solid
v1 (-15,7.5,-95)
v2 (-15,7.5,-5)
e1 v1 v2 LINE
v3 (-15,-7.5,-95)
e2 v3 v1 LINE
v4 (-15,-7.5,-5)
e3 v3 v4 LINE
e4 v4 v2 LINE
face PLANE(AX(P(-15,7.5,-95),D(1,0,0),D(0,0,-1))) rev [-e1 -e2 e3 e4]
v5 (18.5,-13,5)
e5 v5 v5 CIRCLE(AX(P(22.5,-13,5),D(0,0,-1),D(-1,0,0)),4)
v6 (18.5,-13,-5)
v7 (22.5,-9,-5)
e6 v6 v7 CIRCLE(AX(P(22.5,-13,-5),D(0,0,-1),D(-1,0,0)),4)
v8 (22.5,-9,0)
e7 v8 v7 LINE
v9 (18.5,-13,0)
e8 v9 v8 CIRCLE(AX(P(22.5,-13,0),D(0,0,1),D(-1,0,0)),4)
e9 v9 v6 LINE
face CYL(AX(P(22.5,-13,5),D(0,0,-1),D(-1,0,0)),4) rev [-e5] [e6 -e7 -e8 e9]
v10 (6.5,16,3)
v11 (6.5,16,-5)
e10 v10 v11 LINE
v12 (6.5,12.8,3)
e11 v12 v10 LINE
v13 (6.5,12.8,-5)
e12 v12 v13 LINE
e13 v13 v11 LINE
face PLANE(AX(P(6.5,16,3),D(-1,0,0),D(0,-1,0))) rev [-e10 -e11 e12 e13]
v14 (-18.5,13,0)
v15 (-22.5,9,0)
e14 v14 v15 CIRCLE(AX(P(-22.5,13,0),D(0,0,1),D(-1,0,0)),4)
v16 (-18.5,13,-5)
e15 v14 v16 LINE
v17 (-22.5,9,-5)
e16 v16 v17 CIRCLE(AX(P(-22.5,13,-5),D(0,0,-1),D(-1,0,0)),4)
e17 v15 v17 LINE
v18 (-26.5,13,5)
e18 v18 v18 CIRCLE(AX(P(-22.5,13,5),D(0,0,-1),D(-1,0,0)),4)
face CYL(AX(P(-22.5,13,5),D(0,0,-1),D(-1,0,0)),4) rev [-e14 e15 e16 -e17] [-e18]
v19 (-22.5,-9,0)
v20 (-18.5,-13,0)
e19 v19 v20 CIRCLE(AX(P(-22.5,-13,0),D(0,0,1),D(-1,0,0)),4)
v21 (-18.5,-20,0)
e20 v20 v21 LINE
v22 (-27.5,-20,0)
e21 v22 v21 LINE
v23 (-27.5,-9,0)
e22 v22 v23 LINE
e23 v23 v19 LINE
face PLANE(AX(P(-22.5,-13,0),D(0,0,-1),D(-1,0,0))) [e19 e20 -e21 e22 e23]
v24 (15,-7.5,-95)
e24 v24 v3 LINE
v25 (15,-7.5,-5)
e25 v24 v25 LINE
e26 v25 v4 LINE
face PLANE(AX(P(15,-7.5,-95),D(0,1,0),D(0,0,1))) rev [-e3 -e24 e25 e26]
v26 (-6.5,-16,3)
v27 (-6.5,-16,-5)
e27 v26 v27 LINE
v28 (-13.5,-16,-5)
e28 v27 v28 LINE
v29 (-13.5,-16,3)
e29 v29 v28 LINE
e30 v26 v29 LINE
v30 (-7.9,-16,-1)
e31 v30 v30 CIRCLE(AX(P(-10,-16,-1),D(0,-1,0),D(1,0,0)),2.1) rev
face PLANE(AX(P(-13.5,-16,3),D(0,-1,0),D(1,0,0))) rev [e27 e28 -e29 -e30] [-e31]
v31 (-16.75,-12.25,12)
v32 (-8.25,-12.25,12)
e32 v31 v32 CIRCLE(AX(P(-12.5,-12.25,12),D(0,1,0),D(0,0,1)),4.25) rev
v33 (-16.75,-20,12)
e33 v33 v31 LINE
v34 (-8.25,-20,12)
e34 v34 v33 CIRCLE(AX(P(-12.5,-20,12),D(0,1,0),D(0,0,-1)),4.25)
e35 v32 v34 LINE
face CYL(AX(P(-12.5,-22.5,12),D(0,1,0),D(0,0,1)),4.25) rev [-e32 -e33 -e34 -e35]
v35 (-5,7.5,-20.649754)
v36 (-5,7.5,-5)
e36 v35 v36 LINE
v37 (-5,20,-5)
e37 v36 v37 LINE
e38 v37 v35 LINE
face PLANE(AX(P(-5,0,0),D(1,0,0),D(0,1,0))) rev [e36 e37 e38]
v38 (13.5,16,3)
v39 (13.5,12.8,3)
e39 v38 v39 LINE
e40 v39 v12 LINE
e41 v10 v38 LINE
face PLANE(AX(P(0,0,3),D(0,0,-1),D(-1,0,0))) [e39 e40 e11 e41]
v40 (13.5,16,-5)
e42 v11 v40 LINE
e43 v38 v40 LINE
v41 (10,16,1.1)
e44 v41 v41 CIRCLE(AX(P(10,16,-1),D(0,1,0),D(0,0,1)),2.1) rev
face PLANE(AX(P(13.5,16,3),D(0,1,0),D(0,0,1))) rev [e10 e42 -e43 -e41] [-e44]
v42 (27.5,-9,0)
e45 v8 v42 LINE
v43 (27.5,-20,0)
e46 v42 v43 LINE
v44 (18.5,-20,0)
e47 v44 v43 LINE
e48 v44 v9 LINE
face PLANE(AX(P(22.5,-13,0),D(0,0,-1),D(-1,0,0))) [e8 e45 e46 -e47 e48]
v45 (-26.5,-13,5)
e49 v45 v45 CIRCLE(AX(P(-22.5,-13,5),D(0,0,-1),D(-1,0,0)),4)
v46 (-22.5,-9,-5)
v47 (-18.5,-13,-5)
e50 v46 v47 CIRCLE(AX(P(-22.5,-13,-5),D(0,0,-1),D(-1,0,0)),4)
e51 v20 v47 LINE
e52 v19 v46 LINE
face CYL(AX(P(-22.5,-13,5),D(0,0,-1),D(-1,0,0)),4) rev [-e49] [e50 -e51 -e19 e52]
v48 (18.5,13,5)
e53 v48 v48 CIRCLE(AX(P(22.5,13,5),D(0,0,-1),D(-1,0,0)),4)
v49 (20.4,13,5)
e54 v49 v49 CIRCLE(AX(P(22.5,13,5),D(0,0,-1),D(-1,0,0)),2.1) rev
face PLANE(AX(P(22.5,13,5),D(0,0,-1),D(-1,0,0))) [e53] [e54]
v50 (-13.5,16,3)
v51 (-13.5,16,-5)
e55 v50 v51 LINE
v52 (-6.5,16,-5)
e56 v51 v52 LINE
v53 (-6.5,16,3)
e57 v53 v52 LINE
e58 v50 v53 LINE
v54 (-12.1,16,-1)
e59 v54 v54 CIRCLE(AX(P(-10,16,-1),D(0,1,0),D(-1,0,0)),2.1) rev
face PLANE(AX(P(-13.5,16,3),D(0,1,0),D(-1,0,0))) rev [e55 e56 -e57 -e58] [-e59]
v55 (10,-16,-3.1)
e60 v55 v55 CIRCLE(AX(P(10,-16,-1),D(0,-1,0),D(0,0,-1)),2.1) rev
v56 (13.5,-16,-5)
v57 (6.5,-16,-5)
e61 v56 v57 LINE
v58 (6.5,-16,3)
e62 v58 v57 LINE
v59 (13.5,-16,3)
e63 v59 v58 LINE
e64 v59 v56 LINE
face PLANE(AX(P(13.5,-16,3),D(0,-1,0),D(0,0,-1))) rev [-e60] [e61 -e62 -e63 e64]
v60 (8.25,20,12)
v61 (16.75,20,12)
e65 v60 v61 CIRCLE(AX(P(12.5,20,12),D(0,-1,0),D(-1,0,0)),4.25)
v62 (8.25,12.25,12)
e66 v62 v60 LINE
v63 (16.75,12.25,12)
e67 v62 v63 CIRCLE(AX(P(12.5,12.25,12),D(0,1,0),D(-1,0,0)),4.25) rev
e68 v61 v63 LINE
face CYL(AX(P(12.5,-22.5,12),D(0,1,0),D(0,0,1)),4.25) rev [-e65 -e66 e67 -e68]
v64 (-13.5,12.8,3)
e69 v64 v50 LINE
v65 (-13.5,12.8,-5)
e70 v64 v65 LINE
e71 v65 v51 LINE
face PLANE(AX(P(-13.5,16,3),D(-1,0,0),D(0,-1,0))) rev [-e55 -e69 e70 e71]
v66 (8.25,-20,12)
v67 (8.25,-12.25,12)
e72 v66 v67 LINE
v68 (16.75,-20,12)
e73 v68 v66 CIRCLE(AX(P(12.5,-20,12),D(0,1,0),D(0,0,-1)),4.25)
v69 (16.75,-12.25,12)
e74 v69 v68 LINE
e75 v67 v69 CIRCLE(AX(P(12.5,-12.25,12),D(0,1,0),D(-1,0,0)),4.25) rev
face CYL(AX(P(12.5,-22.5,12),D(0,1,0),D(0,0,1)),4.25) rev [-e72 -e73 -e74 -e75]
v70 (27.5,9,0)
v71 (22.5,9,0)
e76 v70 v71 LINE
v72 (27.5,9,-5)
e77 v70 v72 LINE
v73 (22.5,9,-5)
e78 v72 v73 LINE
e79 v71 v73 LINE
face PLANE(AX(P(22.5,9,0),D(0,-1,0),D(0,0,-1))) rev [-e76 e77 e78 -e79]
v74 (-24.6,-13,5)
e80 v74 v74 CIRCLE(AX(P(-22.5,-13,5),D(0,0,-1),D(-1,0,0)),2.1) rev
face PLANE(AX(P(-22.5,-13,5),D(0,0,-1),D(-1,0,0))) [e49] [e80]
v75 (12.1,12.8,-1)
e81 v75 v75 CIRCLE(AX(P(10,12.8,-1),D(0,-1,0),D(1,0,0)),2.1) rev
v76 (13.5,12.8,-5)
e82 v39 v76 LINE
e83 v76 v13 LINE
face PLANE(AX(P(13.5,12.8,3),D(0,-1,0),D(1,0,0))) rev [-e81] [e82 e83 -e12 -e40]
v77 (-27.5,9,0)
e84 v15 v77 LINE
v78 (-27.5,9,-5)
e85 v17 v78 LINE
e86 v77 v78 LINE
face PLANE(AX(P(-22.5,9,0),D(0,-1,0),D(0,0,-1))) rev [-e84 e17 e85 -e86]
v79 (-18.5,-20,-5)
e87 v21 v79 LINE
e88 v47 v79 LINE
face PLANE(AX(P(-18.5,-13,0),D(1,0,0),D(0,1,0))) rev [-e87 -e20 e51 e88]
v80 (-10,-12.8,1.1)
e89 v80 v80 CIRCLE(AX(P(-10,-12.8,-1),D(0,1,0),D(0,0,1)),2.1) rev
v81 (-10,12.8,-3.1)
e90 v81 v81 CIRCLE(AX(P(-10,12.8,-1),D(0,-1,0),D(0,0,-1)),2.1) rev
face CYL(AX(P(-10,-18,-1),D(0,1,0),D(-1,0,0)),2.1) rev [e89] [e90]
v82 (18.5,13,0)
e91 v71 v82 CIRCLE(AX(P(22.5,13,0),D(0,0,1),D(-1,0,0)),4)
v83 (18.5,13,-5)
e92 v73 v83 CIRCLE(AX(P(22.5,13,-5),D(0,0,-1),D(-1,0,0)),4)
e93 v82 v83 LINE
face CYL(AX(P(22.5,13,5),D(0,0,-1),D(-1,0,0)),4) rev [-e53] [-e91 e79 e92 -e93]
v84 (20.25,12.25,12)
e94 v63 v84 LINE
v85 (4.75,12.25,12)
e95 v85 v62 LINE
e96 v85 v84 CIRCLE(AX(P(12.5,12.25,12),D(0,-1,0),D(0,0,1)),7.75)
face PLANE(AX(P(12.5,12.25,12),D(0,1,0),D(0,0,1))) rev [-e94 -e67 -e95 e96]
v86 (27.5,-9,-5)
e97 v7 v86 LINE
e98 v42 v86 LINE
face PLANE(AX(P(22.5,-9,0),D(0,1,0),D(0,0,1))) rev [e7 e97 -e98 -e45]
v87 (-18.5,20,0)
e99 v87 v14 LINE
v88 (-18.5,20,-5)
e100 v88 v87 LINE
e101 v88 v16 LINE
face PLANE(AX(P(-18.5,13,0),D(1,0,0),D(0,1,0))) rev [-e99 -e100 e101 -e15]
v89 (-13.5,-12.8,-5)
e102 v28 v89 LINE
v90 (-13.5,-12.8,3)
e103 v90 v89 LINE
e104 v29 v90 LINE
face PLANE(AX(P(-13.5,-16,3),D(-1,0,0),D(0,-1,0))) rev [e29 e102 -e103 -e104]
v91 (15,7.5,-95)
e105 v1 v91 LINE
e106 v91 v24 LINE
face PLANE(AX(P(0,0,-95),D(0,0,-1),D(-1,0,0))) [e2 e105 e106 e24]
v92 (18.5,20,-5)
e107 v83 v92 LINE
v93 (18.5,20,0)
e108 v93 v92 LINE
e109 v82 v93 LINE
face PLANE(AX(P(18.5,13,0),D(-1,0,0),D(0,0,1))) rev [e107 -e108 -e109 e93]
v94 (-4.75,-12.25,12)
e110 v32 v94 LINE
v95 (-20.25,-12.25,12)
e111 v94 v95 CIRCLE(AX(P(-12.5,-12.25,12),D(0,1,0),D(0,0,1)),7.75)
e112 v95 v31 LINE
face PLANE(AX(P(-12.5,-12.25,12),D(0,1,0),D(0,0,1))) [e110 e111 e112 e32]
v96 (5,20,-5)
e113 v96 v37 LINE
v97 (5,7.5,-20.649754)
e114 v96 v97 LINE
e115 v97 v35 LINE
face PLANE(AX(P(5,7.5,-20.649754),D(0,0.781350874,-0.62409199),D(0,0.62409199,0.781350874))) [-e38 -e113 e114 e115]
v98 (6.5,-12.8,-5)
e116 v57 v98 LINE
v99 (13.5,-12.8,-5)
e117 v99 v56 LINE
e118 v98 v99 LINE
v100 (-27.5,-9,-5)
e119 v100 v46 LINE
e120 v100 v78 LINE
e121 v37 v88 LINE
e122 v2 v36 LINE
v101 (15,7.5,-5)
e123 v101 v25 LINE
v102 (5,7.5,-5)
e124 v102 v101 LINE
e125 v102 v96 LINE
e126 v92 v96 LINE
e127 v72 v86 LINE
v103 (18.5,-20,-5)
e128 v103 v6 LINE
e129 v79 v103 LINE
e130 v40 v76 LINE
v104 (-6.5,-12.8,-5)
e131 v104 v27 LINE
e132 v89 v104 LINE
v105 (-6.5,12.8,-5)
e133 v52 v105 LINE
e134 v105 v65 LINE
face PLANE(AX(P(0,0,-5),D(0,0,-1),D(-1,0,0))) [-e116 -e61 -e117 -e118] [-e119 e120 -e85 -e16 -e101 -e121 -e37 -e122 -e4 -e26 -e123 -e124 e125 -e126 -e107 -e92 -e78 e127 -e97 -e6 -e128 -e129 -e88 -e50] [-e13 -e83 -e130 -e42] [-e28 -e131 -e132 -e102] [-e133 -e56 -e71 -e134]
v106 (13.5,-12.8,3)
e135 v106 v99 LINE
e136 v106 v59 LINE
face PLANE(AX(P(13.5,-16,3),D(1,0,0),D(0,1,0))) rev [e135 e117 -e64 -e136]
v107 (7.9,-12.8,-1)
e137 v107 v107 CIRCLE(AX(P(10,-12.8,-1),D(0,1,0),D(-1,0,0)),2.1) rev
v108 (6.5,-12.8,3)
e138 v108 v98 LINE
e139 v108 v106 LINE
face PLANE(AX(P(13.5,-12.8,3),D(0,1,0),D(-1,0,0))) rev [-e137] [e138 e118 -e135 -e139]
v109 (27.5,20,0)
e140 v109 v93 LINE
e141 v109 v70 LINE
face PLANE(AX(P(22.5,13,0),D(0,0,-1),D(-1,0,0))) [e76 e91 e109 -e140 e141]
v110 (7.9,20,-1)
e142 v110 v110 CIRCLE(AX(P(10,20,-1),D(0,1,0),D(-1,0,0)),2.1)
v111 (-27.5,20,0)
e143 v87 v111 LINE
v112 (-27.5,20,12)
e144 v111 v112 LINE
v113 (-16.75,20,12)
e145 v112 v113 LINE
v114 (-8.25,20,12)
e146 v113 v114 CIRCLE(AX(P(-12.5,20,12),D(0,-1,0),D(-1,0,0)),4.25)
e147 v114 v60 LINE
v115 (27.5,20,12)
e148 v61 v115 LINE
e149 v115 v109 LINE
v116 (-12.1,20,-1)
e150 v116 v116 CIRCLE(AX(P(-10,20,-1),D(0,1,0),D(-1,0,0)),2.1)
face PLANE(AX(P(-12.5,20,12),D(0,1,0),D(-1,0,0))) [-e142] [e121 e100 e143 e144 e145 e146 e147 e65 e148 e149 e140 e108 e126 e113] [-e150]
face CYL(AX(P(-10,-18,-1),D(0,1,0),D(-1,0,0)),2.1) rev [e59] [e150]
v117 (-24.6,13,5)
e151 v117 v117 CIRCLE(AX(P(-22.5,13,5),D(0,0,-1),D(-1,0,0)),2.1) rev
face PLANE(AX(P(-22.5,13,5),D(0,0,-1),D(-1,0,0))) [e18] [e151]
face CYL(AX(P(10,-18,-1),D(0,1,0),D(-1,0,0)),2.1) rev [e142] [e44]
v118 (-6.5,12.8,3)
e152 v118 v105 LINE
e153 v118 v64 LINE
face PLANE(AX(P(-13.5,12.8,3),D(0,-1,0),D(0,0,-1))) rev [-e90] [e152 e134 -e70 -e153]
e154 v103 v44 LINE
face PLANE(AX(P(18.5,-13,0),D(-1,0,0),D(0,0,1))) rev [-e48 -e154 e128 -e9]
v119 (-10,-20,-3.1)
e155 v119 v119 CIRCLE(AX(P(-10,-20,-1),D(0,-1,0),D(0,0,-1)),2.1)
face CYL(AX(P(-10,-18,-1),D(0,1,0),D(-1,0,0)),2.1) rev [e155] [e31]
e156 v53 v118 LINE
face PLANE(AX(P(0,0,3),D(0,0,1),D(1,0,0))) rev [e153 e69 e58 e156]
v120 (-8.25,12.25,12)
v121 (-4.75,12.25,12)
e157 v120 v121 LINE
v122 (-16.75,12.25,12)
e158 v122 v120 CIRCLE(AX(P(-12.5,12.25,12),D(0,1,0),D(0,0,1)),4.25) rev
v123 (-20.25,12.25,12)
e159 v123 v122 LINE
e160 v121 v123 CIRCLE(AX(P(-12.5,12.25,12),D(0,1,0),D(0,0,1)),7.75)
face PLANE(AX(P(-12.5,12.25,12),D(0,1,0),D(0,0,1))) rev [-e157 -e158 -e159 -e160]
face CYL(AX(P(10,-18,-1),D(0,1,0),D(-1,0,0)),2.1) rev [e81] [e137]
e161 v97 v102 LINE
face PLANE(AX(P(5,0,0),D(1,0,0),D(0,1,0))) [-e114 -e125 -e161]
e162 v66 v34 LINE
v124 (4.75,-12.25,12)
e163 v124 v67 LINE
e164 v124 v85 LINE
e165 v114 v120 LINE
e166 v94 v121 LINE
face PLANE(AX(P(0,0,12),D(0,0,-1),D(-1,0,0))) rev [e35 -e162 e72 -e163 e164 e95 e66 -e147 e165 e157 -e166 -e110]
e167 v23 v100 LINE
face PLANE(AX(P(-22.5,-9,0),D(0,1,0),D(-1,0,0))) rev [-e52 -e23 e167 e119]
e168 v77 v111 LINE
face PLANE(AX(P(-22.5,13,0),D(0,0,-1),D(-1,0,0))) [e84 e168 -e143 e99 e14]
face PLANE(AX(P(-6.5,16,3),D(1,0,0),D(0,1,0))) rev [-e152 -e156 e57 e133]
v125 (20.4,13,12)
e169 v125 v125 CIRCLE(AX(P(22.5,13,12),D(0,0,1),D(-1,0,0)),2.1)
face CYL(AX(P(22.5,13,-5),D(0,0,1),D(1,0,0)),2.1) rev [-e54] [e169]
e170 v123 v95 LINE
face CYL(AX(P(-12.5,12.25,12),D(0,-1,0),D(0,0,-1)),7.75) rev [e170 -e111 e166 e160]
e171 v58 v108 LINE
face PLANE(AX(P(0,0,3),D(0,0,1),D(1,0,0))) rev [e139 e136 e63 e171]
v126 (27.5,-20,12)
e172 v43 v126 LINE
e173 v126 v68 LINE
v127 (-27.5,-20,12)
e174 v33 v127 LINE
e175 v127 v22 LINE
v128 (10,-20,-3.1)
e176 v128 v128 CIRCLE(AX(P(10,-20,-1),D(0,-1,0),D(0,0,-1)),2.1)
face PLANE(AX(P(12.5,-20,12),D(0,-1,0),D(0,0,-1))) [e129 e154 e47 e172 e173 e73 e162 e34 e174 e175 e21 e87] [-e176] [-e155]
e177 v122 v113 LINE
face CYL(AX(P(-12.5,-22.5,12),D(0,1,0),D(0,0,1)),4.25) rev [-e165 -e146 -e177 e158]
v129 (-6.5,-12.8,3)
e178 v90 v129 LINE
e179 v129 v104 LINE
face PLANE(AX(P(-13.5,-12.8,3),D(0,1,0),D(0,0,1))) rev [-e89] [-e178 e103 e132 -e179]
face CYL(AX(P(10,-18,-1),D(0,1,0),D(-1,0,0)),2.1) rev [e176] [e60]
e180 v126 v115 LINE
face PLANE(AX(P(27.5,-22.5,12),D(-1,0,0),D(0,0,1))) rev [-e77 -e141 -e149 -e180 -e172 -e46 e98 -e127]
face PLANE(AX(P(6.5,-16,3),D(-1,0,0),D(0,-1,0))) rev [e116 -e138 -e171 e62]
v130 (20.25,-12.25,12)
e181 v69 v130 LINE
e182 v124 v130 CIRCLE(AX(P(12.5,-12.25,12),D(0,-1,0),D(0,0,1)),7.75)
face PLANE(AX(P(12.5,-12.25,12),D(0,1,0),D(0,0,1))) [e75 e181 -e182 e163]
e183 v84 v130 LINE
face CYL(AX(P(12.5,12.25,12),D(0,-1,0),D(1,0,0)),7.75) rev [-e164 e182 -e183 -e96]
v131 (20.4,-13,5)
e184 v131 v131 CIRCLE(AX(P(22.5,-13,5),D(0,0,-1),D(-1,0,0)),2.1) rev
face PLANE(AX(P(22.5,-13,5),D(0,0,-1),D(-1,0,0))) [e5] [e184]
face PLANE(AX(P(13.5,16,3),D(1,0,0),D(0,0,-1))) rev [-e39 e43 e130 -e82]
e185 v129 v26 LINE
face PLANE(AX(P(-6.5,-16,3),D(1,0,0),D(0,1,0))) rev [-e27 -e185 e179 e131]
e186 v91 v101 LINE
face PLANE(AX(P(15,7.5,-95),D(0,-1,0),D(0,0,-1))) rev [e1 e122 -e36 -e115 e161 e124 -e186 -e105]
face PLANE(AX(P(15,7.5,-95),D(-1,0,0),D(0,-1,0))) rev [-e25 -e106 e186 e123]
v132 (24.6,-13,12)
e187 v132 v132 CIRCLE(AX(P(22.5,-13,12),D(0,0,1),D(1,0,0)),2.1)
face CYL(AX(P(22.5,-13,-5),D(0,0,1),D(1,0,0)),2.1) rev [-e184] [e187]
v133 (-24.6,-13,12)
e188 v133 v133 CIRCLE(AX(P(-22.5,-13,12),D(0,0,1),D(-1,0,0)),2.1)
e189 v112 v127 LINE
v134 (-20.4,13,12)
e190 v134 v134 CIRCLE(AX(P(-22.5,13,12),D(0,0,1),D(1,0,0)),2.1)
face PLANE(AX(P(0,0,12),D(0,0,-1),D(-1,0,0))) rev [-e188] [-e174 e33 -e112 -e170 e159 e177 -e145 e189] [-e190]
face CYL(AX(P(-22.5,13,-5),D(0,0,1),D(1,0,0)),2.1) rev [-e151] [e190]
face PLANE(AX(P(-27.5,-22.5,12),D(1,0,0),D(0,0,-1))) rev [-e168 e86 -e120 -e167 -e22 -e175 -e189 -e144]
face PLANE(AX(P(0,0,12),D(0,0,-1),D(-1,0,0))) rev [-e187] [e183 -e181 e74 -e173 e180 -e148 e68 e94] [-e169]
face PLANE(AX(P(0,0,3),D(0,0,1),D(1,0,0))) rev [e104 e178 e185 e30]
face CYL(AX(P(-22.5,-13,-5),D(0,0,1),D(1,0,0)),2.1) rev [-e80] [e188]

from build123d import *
from build123d.topology import SkipClean

# Parameters (mm, degrees)
ESQUISSE1_W              = 55
ESQUISSE1_H              = 45
BOSS_EXTRU_1_DEPTH       = 12
ESQUISSE2_R              = 4.25
ENL_V_MAT_EXTRU_1_DEPTH  = 55.085580333
ESQUISSE3_R              = 7.75
ENL_V_MAT_EXTRU_2_DEPTH  = 12.25
ESQUISSE9_W              = 61.062756781
ESQUISSE9_H              = 12.22812859
ESQUISSE9_W_2            = 59.427147224
ESQUISSE9_H_2            = 8.100161614
ENL_V_MAT_EXTRU_7_DEPTH  = 31
SKETCH1_W                = 55
SKETCH1_H                = 36
BOSS_EXTRUDE1_DEPTH      = 5
SKETCH2_R                = 2.1
CUT_EXTRUDE1_DEPTH       = 38.003378224
SKETCH3_R                = 4
CUT_EXTRUDE2_DEPTH       = 10
CUT_EXTRUDE3_DEPTH       = 5
SKETCH5_R                = 2.1
CUT_EXTRUDE4_DEPTH       = 47.864165415
BOSS_EXTRUDE4_START      = 2
SKETCH7_R                = 2.1
BOSS_EXTRUDE4_DEPTH      = 2
SKETCH8_R                = 2.1
BOSS_EXTRUDE5_DEPTH      = 2
SKETCH9_W                = 7
SKETCH9_H                = 3.2
CUT_EXTRUDE6_DEPTH       = 8
SKETCH10_W               = 30
SKETCH10_H               = 15
BOSS_EXTRUDE6_DEPTH      = 90
BOSS_EXTRUDE7_DEPTH      = 5
BOSS_EXTRUDE7_DEPTH_BACK = 5


with BuildPart() as part:
    # Esquisse1 → Boss.-Extru.1 (new body)
    with BuildSketch(Plane.XY):
        Rectangle(ESQUISSE1_W, ESQUISSE1_H)
    extrude(amount=BOSS_EXTRU_1_DEPTH)

    # Esquisse2 → Enlèv. mat.-Extru.1 (cut, through all)
    with BuildSketch(Plane(origin=(0, 22.5, 0), x_dir=(1, 0, 0), z_dir=(0, 1, 0))):
        with Locations((-12.5, -12)):
            Circle(ESQUISSE2_R)
        with Locations((12.5, -12)):
            Circle(ESQUISSE2_R)
    extrude(amount=-ENL_V_MAT_EXTRU_1_DEPTH, mode=Mode.SUBTRACT)

    # Esquisse3 → Enlèv. mat.-Extru.2 (cut, symmetric)
    with BuildSketch(Plane(origin=(0, 0, 0), x_dir=(1, 0, 0), z_dir=(0, 1, 0))):
        with Locations((-12.5, -12)):
            Circle(ESQUISSE3_R)
    enl_v_mat_extru_2 = extrude(amount=ENL_V_MAT_EXTRU_2_DEPTH, both=True, mode=Mode.SUBTRACT)

    # Esquisse9 → Enlèv. mat.-Extru.7 (cut)
    with BuildSketch(Plane.XY.offset(12)):
        with Locations((-0.389430846, -24.114064295)):
            Rectangle(ESQUISSE9_W, ESQUISSE9_H)
        with Locations((1.674552641, 22.050080807)):
            Rectangle(ESQUISSE9_W_2, ESQUISSE9_H_2)
    extrude(amount=-ENL_V_MAT_EXTRU_7_DEPTH, mode=Mode.SUBTRACT)

    # Sketch1 → Boss-Extrude1 (add)
    with BuildSketch(Plane(origin=(0, 0, 0), x_dir=(-1, 0, 0), z_dir=(0, 0, -1))):
        Rectangle(SKETCH1_W, SKETCH1_H)
    extrude(amount=BOSS_EXTRUDE1_DEPTH)

    # Sketch2 → Cut-Extrude1 (cut, through all)
    with BuildSketch(Plane.XY.offset(12)):
        with Locations((-22.5, 13)):
            Circle(SKETCH2_R)
        with Locations((22.5, 13)):
            Circle(SKETCH2_R)
        with Locations((22.5, -13)):
            Circle(SKETCH2_R)
        with Locations((-22.5, -13)):
            Circle(SKETCH2_R)
    extrude(amount=-CUT_EXTRUDE1_DEPTH, mode=Mode.SUBTRACT)

    # Sketch3 → Cut-Extrude2 (cut)
    with BuildSketch(Plane(origin=(0, 0, -5), x_dir=(-1, 0, 0), z_dir=(0, 0, -1))):
        with Locations((-22.5, 13)):
            Circle(SKETCH3_R)
        with Locations((22.5, 13)):
            Circle(SKETCH3_R)
        with Locations((22.5, -13)):
            Circle(SKETCH3_R)
        with Locations((-22.5, -13)):
            Circle(SKETCH3_R)
    extrude(amount=-CUT_EXTRUDE2_DEPTH, mode=Mode.SUBTRACT)

    # Sketch4 → Cut-Extrude3 (cut)
    with BuildSketch(Plane(origin=(0, 0, -5), x_dir=(-1, 0, 0), z_dir=(0, 0, -1))):
        with BuildLine():
            Line((-18.5, 13), (-18.5, 18))
            Line((-18.5, 18), (-27.5, 18))
            Line((-27.5, 18), (-27.5, 9))
            Line((-27.5, 9), (-22.5, 9))
            ThreePointArc((-22.5, 9), (-25.328427125, 15.828427125), (-18.5, 13))
        make_face()
        with BuildLine():
            Line((-22.5, -9), (-27.5, -9))
            Line((-27.5, -9), (-27.5, -18))
            Line((-27.5, -18), (-18.5, -18))
            Line((-18.5, -18), (-18.5, -13))
            ThreePointArc((-18.5, -13), (-25.328427125, -15.828427125), (-22.5, -9))
        make_face()
        with BuildLine():
            Line((27.5, -18), (27.5, -9))
            Line((27.5, -9), (22.5, -9))
            ThreePointArc((22.5, -9), (25.328427125, -15.828427125), (18.5, -13))
            Line((18.5, -13), (18.5, -18))
            Line((18.5, -18), (27.5, -18))
        make_face()
        with BuildLine():
            Line((27.5, 18), (18.5, 18))
            Line((18.5, 18), (18.5, 13))
            ThreePointArc((18.5, 13), (25.328427125, 15.828427125), (22.5, 9))
            Line((22.5, 9), (27.5, 9))
            Line((27.5, 9), (27.5, 18))
        make_face()
    extrude(amount=-CUT_EXTRUDE3_DEPTH, mode=Mode.SUBTRACT)

    # Sketch5 → Cut-Extrude4 (cut, through all)
    with BuildSketch(Plane(origin=(0, 18, 0), x_dir=(1, 0, 0), z_dir=(0, 1, 0))):
        with Locations((-10, 1)):
            Circle(SKETCH5_R)
        with Locations((10, 1)):
            Circle(SKETCH5_R)
    extrude(amount=-CUT_EXTRUDE4_DEPTH, mode=Mode.SUBTRACT)

    # Sketch7 → Boss-Extrude4 (add)
    with SkipClean():  # the faces are left unmerged after this step: merging them gives an invalid solid
        with BuildSketch(Plane(origin=(0, 18, 0), x_dir=(1, 0, 0), z_dir=(0, 1, 0)).offset(BOSS_EXTRUDE4_START)):
            with BuildLine():
                Line((18.5, 5), (-18.5, 5))
                Line((-18.5, 5), (-18.5, 0))
                Line((-18.5, 0), (-27.5, 0))
                Line((-27.5, 0), (-27.5, -12))
                Line((-27.5, -12), (-16.75, -12))
                ThreePointArc((-16.75, -12), (-12.5, -7.75), (-8.25, -12))
                Line((-8.25, -12), (8.25, -12))
                ThreePointArc((8.25, -12), (12.5, -7.75), (16.75, -12))
                Line((16.75, -12), (27.5, -12))
                Line((27.5, -12), (27.5, 0))
                Line((27.5, 0), (18.5, 0))
                Line((18.5, 0), (18.5, 5))
            make_face()
            with Locations((10, 1)):
                Circle(SKETCH7_R, mode=Mode.SUBTRACT)
            with Locations((-10, 1)):
                Circle(SKETCH7_R, mode=Mode.SUBTRACT)
        extrude(amount=-BOSS_EXTRUDE4_DEPTH)
    add(part.part.scale(1), mode=Mode.REPLACE)  # the faces are merged on a copy

    # Sketch8 → Boss-Extrude5 (add)
    with BuildSketch(Plane.XZ.offset(18)):
        with BuildLine():
            Line((-27.5, 0), (-18.5, 0))
            Line((-18.5, 0), (-18.5, -5))
            Line((-18.5, -5), (18.5, -5))
            Line((18.5, -5), (18.5, 0))
            Line((18.5, 0), (27.5, 0))
            Line((27.5, 0), (27.5, 12))
            Line((27.5, 12), (16.75, 12))
            ThreePointArc((16.75, 12), (12.5, 7.75), (8.25, 12))
            Line((8.25, 12), (-8.25, 12))
            ThreePointArc((-8.25, 12), (-12.5, 7.75), (-16.75, 12))
            Line((-16.75, 12), (-27.5, 12))
            Line((-27.5, 12), (-27.5, 0))
        make_face()
        with Locations((10, -1)):
            Circle(SKETCH8_R, mode=Mode.SUBTRACT)
        with Locations((-10, -1)):
            Circle(SKETCH8_R, mode=Mode.SUBTRACT)
    extrude(amount=BOSS_EXTRUDE5_DEPTH)

    # Sketch9 → Cut-Extrude6 (cut)
    with BuildSketch(Plane(origin=(0, 0, -5), x_dir=(-1, 0, 0), z_dir=(0, 0, -1))):
        with Locations((-10, 14.4)):
            Rectangle(SKETCH9_W, SKETCH9_H)
        with Locations((10, 14.4)):
            Rectangle(SKETCH9_W, SKETCH9_H)
        with Locations((10, -14.4)):
            Rectangle(SKETCH9_W, SKETCH9_H)
        with Locations((-10, -14.4)):
            Rectangle(SKETCH9_W, SKETCH9_H)
    extrude(amount=-CUT_EXTRUDE6_DEPTH, mode=Mode.SUBTRACT)

    # Mirror1: Enlèv. mat.-Extru.2 across plane
    add(enl_v_mat_extru_2.mirror(Plane.ZY), mode=Mode.SUBTRACT)

    # Sketch10 → Boss-Extrude6 (add)
    with BuildSketch(Plane(origin=(0, 0, -5), x_dir=(-1, 0, 0), z_dir=(0, 0, -1))):
        Rectangle(SKETCH10_W, SKETCH10_H)
    extrude(amount=BOSS_EXTRUDE6_DEPTH)

    # Sketch11 → Boss-Extrude7 (add, two sides: drawn at the far end of the back side and taken through both)
    with BuildSketch(Plane.ZY.offset(-BOSS_EXTRUDE7_DEPTH_BACK)):
        Polygon((-5, 7.5), (-20.649753688, 7.5), (-5, 20), align=None)
    extrude(amount=BOSS_EXTRUDE7_DEPTH + BOSS_EXTRUDE7_DEPTH_BACK)


solid = part.part
